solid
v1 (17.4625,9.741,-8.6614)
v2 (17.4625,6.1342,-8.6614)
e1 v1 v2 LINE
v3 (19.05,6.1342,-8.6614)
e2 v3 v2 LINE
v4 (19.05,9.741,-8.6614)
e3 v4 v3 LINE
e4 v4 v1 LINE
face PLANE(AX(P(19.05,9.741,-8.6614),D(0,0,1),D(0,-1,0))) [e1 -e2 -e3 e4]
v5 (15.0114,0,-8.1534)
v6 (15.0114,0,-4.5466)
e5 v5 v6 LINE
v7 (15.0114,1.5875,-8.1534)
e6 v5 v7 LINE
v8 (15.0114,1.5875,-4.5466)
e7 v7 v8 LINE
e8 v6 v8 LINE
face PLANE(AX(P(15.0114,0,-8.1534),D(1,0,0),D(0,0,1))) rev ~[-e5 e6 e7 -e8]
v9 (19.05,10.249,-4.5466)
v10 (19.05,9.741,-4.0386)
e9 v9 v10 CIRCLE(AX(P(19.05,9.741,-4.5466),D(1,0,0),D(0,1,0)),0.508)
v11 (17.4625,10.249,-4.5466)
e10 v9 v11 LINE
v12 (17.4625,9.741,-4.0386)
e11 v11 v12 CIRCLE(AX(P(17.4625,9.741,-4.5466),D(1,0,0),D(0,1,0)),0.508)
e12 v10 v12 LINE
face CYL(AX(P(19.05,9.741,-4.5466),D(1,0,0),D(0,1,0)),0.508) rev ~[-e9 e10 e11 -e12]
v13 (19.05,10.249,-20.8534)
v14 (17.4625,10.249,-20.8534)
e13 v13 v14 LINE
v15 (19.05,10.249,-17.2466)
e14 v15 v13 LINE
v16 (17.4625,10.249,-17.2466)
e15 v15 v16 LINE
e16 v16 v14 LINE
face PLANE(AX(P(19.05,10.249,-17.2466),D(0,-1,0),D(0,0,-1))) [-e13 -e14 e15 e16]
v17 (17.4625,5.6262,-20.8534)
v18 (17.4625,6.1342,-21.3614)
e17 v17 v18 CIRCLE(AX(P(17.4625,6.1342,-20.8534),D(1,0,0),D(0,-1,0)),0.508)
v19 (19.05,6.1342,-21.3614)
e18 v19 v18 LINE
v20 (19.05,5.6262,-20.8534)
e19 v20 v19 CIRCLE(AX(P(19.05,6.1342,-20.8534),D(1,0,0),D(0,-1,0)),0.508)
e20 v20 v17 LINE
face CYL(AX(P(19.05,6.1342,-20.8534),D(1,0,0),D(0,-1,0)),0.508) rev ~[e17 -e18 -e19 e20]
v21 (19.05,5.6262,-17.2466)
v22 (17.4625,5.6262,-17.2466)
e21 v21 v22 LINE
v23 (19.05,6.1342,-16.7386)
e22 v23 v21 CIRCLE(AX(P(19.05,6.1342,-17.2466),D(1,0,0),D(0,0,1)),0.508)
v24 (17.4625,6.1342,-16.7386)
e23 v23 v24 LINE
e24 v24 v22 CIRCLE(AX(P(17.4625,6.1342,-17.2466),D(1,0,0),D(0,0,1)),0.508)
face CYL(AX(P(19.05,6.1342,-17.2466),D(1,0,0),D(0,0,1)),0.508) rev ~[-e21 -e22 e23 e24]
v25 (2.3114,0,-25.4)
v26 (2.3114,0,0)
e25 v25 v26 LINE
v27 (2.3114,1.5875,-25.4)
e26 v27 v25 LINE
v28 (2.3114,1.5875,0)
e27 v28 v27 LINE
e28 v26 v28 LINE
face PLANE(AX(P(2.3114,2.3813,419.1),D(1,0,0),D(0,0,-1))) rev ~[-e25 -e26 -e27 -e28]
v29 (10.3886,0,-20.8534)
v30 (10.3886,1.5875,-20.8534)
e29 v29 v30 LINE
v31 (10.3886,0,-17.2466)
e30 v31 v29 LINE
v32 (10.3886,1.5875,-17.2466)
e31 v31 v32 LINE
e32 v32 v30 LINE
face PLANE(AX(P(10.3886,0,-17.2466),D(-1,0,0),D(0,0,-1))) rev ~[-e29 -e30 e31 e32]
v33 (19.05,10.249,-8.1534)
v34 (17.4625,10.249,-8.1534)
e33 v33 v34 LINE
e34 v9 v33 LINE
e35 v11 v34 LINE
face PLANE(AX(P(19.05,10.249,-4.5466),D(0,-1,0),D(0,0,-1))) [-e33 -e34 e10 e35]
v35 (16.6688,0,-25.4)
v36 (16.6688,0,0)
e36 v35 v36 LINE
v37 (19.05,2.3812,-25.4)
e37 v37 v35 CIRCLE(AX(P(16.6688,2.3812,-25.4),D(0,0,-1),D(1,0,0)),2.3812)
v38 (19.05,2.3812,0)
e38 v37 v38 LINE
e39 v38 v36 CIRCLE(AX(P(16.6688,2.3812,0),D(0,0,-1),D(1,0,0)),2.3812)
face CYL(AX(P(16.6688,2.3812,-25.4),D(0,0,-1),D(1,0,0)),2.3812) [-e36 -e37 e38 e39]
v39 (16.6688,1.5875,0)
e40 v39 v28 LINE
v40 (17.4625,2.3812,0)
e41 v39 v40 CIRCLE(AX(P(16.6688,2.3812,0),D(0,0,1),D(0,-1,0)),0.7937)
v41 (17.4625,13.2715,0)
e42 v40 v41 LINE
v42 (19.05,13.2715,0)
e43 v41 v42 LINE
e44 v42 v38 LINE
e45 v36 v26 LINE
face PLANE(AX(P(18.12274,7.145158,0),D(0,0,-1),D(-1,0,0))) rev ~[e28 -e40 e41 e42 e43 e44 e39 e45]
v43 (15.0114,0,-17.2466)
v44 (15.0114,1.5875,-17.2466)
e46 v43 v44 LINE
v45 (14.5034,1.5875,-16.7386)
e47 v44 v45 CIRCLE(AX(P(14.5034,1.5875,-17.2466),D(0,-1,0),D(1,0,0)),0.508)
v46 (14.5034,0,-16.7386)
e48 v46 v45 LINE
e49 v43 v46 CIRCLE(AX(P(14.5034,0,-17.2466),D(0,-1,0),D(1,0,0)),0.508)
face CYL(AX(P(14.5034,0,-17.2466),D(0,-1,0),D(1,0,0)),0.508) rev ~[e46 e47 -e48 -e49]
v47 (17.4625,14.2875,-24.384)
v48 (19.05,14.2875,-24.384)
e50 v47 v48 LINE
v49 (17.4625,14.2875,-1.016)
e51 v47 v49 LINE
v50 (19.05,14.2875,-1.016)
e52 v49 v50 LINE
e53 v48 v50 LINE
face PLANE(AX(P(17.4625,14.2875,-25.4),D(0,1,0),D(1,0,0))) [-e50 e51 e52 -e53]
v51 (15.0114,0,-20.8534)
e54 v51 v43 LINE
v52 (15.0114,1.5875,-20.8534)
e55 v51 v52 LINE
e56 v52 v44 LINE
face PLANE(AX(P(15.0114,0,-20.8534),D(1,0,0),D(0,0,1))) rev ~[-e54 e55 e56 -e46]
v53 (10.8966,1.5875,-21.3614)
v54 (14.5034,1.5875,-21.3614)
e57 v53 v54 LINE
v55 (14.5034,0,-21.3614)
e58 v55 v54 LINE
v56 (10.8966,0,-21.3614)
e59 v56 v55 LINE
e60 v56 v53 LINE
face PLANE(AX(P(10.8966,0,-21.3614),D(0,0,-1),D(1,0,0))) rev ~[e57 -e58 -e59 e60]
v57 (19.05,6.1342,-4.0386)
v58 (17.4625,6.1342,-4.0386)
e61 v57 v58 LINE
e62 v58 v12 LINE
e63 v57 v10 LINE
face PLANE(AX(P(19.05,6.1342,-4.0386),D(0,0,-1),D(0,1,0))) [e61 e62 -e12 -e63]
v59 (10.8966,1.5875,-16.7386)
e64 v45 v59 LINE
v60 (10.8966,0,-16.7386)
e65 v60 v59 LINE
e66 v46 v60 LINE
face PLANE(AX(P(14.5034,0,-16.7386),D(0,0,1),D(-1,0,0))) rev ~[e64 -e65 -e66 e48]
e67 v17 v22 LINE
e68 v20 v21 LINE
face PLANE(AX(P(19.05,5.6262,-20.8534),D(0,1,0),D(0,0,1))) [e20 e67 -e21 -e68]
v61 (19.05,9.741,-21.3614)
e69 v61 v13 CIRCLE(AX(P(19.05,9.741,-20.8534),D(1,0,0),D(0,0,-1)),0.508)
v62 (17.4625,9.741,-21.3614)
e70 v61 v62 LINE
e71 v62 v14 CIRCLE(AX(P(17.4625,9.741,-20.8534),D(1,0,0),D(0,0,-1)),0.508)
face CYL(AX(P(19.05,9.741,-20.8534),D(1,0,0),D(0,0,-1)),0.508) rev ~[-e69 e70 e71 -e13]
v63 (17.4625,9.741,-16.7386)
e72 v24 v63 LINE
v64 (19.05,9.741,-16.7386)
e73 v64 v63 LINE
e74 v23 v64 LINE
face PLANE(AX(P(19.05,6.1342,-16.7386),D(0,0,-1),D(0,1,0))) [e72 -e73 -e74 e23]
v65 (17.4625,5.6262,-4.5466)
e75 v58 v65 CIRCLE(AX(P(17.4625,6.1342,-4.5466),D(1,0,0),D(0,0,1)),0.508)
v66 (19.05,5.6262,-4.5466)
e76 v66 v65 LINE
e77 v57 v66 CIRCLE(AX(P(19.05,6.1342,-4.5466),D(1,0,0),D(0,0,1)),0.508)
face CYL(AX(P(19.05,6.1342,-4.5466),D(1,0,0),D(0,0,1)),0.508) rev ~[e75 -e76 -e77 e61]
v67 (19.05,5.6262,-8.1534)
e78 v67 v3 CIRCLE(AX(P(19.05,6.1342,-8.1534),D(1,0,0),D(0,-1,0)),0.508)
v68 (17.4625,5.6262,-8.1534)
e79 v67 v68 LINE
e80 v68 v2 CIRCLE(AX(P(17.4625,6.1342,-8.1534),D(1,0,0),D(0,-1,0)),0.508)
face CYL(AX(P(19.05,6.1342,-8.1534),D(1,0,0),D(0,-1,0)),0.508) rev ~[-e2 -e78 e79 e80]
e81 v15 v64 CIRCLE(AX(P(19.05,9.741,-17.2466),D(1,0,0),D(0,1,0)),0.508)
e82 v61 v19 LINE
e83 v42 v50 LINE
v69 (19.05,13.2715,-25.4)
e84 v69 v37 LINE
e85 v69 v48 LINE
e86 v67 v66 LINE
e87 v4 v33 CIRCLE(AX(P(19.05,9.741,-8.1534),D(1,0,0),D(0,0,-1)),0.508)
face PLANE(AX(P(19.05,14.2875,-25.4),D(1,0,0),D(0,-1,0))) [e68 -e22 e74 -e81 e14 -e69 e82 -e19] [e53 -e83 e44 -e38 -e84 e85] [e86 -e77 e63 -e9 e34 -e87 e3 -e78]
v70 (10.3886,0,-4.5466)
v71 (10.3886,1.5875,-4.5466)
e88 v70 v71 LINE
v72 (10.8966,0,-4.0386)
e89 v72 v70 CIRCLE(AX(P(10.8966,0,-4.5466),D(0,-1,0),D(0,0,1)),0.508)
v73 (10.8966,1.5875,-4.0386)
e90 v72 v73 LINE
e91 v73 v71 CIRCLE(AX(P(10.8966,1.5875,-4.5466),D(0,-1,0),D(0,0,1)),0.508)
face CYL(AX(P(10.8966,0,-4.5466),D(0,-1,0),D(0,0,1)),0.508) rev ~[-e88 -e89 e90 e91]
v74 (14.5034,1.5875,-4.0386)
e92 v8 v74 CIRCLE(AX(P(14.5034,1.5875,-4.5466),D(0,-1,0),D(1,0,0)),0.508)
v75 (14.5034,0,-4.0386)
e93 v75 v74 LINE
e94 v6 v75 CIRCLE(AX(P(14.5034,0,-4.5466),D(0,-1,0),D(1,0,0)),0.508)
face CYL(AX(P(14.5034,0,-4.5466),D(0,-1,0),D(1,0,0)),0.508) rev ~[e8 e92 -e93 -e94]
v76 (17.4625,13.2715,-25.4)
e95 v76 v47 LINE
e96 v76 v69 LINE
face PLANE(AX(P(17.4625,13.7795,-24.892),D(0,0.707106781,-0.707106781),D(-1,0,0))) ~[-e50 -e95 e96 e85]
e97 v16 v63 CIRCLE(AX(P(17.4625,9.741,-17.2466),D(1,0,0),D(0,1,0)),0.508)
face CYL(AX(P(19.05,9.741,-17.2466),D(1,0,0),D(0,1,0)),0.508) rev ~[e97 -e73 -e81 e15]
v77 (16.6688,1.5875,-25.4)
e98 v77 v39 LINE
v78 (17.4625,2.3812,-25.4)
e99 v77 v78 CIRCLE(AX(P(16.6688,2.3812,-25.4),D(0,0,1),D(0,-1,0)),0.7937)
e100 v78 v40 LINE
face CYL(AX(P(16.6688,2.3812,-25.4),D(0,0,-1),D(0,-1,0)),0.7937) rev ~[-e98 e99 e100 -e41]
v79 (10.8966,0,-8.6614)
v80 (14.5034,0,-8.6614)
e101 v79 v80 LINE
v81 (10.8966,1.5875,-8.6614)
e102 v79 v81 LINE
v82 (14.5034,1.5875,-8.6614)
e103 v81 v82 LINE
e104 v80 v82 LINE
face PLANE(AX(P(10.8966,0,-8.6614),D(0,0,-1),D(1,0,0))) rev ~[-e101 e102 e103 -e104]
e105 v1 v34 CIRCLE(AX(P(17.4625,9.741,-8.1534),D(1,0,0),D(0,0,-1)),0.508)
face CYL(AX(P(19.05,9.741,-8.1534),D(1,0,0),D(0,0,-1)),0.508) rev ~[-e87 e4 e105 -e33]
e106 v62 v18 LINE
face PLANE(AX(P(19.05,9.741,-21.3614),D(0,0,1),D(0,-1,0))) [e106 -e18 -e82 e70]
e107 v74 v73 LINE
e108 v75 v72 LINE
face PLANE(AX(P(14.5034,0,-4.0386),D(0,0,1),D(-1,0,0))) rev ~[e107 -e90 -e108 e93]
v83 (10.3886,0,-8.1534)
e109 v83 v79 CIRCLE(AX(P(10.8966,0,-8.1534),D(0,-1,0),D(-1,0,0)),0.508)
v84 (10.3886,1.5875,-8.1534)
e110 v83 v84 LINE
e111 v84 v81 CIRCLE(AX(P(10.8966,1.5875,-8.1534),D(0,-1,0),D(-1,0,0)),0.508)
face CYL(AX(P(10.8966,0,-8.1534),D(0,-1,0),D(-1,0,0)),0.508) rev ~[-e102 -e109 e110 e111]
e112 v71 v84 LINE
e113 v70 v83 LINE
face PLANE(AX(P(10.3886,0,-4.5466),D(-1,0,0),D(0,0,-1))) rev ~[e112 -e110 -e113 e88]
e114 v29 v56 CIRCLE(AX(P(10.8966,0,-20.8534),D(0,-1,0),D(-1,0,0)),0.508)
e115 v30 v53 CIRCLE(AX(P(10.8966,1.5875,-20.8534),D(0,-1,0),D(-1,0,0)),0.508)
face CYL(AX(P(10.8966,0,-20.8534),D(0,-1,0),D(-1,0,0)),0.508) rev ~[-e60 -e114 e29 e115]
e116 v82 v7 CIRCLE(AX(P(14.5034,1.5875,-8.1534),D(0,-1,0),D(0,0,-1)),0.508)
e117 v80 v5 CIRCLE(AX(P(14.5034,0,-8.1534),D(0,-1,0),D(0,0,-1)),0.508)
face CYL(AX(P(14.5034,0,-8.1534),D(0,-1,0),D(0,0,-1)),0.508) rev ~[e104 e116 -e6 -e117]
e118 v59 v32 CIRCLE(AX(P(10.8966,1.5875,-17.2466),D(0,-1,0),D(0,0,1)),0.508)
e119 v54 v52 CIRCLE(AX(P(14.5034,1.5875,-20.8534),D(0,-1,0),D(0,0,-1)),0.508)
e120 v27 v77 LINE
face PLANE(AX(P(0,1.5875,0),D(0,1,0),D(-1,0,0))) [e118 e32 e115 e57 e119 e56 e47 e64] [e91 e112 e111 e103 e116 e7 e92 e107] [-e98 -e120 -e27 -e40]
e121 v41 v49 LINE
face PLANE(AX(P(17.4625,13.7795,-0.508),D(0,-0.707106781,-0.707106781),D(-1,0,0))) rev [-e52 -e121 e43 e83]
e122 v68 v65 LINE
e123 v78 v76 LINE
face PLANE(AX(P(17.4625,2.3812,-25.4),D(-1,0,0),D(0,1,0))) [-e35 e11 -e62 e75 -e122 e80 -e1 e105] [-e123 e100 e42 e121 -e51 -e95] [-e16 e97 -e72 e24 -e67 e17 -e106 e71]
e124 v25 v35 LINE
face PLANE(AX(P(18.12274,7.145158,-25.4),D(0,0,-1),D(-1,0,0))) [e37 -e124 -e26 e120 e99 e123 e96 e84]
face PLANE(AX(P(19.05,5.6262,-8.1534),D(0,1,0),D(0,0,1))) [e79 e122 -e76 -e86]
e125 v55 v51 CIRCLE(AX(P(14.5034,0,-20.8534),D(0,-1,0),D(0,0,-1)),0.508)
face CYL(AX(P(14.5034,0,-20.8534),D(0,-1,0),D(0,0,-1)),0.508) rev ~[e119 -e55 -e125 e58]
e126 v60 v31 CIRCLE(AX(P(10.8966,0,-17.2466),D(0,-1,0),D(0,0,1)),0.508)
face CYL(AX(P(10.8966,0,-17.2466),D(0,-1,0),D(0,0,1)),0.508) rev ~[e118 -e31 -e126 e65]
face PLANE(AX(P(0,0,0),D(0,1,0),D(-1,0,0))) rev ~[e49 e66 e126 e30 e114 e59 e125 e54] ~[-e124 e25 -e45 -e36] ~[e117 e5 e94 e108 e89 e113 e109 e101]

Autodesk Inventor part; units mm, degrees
ref_plane "YZ Plane" through (0, 0, 0) normal (1, 0, 0) x (0, 1, 0)
ref_plane "XZ Plane" through (0, 0, 0) normal (0, 1, 0) x (-1, 0, 0)
sketch "Sketch1" plane through (0, 0, 0) normal (0, 1, 0) x (-1, 0, 0)
  line L0 (-19.05, 0) -> (19.05, 0)
  line L1 (19.05, 0) -> (19.05, -25.4)
  line L2 (19.05, -25.4) -> (-19.05, -25.4)
  line L3 (-19.05, -25.4) -> (-19.05, 0)
  line L4 (19.05, 0) -> (-19.05, -25.4) construction
  point P0 (0, 0)
  point P1 (0, 0)
  dimension "d0" = 38.1
  dimension "d1" = 25.4
extrude "Plate1" add sketch "Sketch1" along normal blind 1.5875
sketch "Sketch2" plane through (17.4625, 0, -25.4) normal (1, 0, 0) x (0, 1, 0)
  line L0 (0, 25.4) -> (0, 0)
  line L1 (0, 0) -> (14.2875, 0)
  line L2 (14.2875, 0) -> (14.2875, 25.4)
  line L3 (14.2875, 25.4) -> (0, 25.4)
edge flange "Flanges" height 12.7 angle 90 thickness 1.5875 bend radius 0.7937 thickness toward (1, 0, 0) relief tear relief width 1.5875 relief depth 0.7937 corner gap 1.5875 corner form 0 edges at (19.05, 1.5875, -12.7) (-19.05, 1.5875, -12.7) wall of the first edge with corners at (17.4625, 0, 0) (17.4625, 0, -25.4) (17.4625, 14.2875, -25.4) (17.4625, 14.2875, 0)
bend "Bend1"
corner "Corner1"
sketch "Sketch3" plane through (19.05, 2.3813, -25.4) normal (1, 0, 0) x (0, 0, -1)
  line L0 (-20.8534, 7.8677) -> (-17.2466, 7.8677)
  line L1 (-16.7386, 7.3597) -> (-16.7386, 3.7529)
  line L2 (-17.2466, 3.2449) -> (-20.8534, 3.2449)
  line L3 (-21.3614, 3.7529) -> (-21.3614, 7.3597)
  arc A0 (-20.8534, 7.8677) -> (-21.3614, 7.3597) centre (-20.8534, 7.3597) ccw
  arc A1 (-16.7386, 7.3597) -> (-17.2466, 7.8677) centre (-17.2466, 7.3597) ccw
  arc A2 (-17.2466, 3.2449) -> (-16.7386, 3.7529) centre (-17.2466, 3.7529) ccw
  arc A3 (-21.3614, 3.7529) -> (-20.8534, 3.2449) centre (-20.8534, 3.7529) ccw
  line L4 (-25.4, 0) -> (-25.4, 11.9063) construction
  line L5 (-25.4, 11.9063) -> (0, 11.9062) construction
  line L6 (-20.8534, 7.3597) -> (-17.2466, 3.7529) construction
  point P0 (-25.4, -2.3812)
  point P1 (-16.7386, 3.2449)
  point P2 (-21.3614, 3.2449)
  point P3 (-19.05, 5.5563)
  dimension "d16" = 4.6228
  dimension "d17" = 0.508
  dimension "d20" = 6.35
  dimension "d21" = 6.35
extrude "Flange Stamp" cut sketch "Sketch3" against normal blind 1.5875
sketch "Sketch7" plane through (19.05, 2.3813, 0) normal (1, 0, 0) x (0, 0, -1)
  arc A0 (4.5466, 7.8677) -> (4.0386, 7.3597) centre (4.5466, 7.3597) ccw construction
  arc A1 (8.1534, 3.2449) -> (8.6614, 3.7529) centre (8.1534, 3.7529) ccw construction
  circle A2 centre (6.35, 5.5563) radius 2.1844
  line L0 (4.5466, 7.3597) -> (8.1534, 3.7529) construction
  point P0 (0, -2.3812)
  dimension "d46" = 4.3688
surface extrude "Flange Circle" sketch "Sketch7" against normal up to surface (1.5875 mm away) shown yes curves A2
ref_plane "Flange Pattern Plane" through (19.05, 7.9375, -4.5466) normal (0, 1, 0) x (1, 0, 0)
sketch "Flange Pattern Sketch" plane through (19.05, 7.9375, -4.5466) normal (0, 1, 0) x (1, 0, 0)
  line L0 (0, 3.6068) -> (0, 0) construction
  line L1 (-45.8186, -4.5466) -> (8.2118, -4.5466) construction
  line L2 (0, 0) -> (-1.5875, 0) construction
  point P0 (-19.05, -4.5466)
  point P1 (0, 1.8034)
  point P2 (0, 14.5034)
  dimension "d131" = 12.7
  dimension "d134" = 12.7
pattern_sketch "Flange Pattern" of "Flange Circle", "Flange Stamp" from (19.05, 7.9375, -6.35) copies at (19.05, 7.9375, -19.05)
sketch "Sketch8" plane through (0, 0, 0) normal (0, -1, 0) x (1, 0, 0)
  line L0 (16.6687, 0) -> (-16.6687, 0) construction
  line L1 (14.5034, -4.0386) -> (10.8966, -4.0386)
  line L2 (10.3886, -4.5466) -> (10.3886, -8.1534)
  line L3 (10.8966, -8.6614) -> (14.5034, -8.6614)
  line L4 (15.0114, -8.1534) -> (15.0114, -4.5466)
  arc A0 (15.0114, -4.5466) -> (14.5034, -4.0386) centre (14.5034, -4.5466) ccw
  arc A1 (14.5034, -8.6614) -> (15.0114, -8.1534) centre (14.5034, -8.1534) ccw
  arc A2 (10.3886, -8.1534) -> (10.8966, -8.6614) centre (10.8966, -8.1534) ccw
  arc A3 (10.8966, -4.0386) -> (10.3886, -4.5466) centre (10.8966, -4.5466) ccw
  line L5 (14.5034, -4.5466) -> (10.8966, -8.1534) construction
  line L6 (19.05, 0) -> (19.05, -25.4) construction
  point P0 (0, 0)
  point P1 (10.3886, -8.6614)
  point P2 (15.0114, -8.6614)
  point P3 (12.7, -6.35)
  dimension "d49" = 4.6228
  dimension "d50" = 0.508
  dimension "d51" = 6.35
  dimension "d52" = 6.35
extrude "Body Stamp" cut sketch "Sketch8" against normal blind 1.5875
sketch "Sketch9" plane through (0, 0, 0) normal (0, -1, 0) x (1, 0, 0)
  arc A0 (15.0114, -4.5466) -> (14.5034, -4.0386) centre (14.5034, -4.5466) ccw construction
  arc A1 (10.3886, -8.1534) -> (10.8966, -8.6614) centre (10.8966, -8.1534) ccw construction
  line L0 (14.5034, -4.5466) -> (10.8966, -8.1534) construction
  circle A2 centre (12.7, -6.35) radius 2.1844
  point P0 (0, 0)
  dimension "d55" = 4.3688
surface extrude "Body Circle" sketch "Sketch9" against normal up to surface (1.5875 mm away) shown yes curves A2
sketch "Body Pattern Sketch" plane through (0, 0, 0) normal (0, -1, 0) x (1, 0, 0)
  line L0 (16.6687, 0) -> (-16.6687, 0) construction
  line L1 (19.05, 0) -> (19.05, -25.4) construction
  circle A0 centre (12.7, -6.35) radius 2.1844 construction
  point P0 (0, 0)
  point P1 (12.7, -19.05)
  dimension "d62" = 12.7
  dimension "d65" = 12.7
  dimension "d139" = 12.7
pattern_sketch "Body Pattern" of "Body Stamp", "Body Circle" from (12.7, 0, -6.35) copies at (12.7, 0, -19.05)
sketch "Arc Length" plane through (17.4625, 2.3813, 0) normal (0, 0, 1) x (1, 0, 0)
  line L0 (0, 0) -> (1.5875, 0) construction
  arc A0 (-0.7937, -0.7938) -> (0, 0) centre (-0.7937, 0) ccw construction
  line L1 (-0.7938, -2.3813) -> (-0.7937, -0.7938) construction
  arc A1 (-0.7938, -2.3813) -> (1.5875, 0) centre (-0.7937, 0) ccw construction
  point P0 (-17.4625, -2.3812)
  dimension "d85" = 3.7405
  dimension "d92" = 1.2468
sketch "Sketch13" plane through (19.05, 14.2875, 0) normal (1, 0, 0) x (0, 0, -1)
  line L0 (0, 0) -> (25.4, 0) construction
  line L1 (62.4078, 0) -> (63.4238, -1.016)
  line L2 (63.4238, -1.016) -> (64.4398, 0)
  line L3 (62.4078, 0) -> (64.4398, 0)
  line L4 (25.4, -11.9062) -> (0, -11.9062) construction
  line L5 (63.4238, -10.8903) -> (61.161, -13.1531)
  line L6 (61.161, -13.1531) -> (63.4238, -15.4159)
  line L7 (63.4238, -15.4159) -> (65.6866, -13.1531)
  line L8 (65.6866, -13.1531) -> (63.4238, -10.8903)
  line L9 (63.4238, -10.8903) -> (63.4238, -15.4159) construction
  line L10 (63.4238, -1.016) -> (63.4238, -10.8903) construction
  line L11 (0, -11.9062) -> (25.4, -11.9062) construction
  point P0 (0, -14.2875)
  dimension "d86" = 4.5256
  dimension "d88" = 1.016
  dimension "d91" = 1.016
  dimension "d102" = 63.4238
feature "Notch" [suppressed]
mirror "Notch Mirror" [suppressed]
pattern_linear "Notch Pattern" [suppressed]
chamfer "End Chamfer" distance 1.016 angle 45 4 edges at (-18.2562, 14.2875, -25.4) (18.2563, 14.2875, -25.4) (-18.2562, 14.2875, 0) (18.2562, 14.2875, 0)
sketch "Sketch14" plane through (-19.05, 2.3813, 419.1) normal (1, 0, 0) x (0, 0, -1)
  line L0 (419.1, 11.9063) -> (444.5, 11.9063) construction
  line L1 (419.1, 0) -> (419.1, 11.9063) construction
  line L2 (419.1, -2.3813) -> (444.5, -2.3813) construction
  line L3 (419.1, 11.9063) -> (444.5, 11.9063)
  line L4 (444.5, 11.9063) -> (444.5, -2.3813)
  line L5 (444.5, -2.3813) -> (419.1, -2.3813)
  line L6 (419.1, -2.3813) -> (419.1, 11.9063)
  point P0 (419.1, -2.3812)
  point P1 (382.0521, -1.9844)
extrude "Half Cut" cut sketch "Sketch14" along normal blind 21.3614
equation "\"d1\" = 12.7 * Length"
equation "\"d18\" = Thickness"
equation "\"d53\" = Thickness"
equation "\"d89\" = Thickness"
equation "\"d2\" = Thickness"
equation "\"d3\" = BendReliefWidth"
equation "\"d4\" = BendReliefDepth"
equation "\"d5\" = MinimumRemnant"
equation "\"d6\" = TransitionRadius"
equation "\"d10\" = CornerReliefSize"
equation "\"d11\" = GapSize"
equation "\"d12\" = JacobiRadiusSize"
equation "\"BendRadius\" = Thickness"
equation "\"BendReliefWidth\" = Thickness"
equation "\"BendReliefDepth\" = 0.5 * Thickness"
equation "\"CornerReliefSize\" = 4 * Thickness"
equation "\"MinimumRemnant\" = 2 * Thickness"
equation "\"TransitionRadius\" = BendRadius"
equation "\"JacobiRadiusSize\" = BendRadius"
equation "\"GapSize\" = Thickness"
equation "\"Length\" = 2"
equation "\"Thickness\" = 1.5875"
properties part number "Alu C 1x3x1x35"
